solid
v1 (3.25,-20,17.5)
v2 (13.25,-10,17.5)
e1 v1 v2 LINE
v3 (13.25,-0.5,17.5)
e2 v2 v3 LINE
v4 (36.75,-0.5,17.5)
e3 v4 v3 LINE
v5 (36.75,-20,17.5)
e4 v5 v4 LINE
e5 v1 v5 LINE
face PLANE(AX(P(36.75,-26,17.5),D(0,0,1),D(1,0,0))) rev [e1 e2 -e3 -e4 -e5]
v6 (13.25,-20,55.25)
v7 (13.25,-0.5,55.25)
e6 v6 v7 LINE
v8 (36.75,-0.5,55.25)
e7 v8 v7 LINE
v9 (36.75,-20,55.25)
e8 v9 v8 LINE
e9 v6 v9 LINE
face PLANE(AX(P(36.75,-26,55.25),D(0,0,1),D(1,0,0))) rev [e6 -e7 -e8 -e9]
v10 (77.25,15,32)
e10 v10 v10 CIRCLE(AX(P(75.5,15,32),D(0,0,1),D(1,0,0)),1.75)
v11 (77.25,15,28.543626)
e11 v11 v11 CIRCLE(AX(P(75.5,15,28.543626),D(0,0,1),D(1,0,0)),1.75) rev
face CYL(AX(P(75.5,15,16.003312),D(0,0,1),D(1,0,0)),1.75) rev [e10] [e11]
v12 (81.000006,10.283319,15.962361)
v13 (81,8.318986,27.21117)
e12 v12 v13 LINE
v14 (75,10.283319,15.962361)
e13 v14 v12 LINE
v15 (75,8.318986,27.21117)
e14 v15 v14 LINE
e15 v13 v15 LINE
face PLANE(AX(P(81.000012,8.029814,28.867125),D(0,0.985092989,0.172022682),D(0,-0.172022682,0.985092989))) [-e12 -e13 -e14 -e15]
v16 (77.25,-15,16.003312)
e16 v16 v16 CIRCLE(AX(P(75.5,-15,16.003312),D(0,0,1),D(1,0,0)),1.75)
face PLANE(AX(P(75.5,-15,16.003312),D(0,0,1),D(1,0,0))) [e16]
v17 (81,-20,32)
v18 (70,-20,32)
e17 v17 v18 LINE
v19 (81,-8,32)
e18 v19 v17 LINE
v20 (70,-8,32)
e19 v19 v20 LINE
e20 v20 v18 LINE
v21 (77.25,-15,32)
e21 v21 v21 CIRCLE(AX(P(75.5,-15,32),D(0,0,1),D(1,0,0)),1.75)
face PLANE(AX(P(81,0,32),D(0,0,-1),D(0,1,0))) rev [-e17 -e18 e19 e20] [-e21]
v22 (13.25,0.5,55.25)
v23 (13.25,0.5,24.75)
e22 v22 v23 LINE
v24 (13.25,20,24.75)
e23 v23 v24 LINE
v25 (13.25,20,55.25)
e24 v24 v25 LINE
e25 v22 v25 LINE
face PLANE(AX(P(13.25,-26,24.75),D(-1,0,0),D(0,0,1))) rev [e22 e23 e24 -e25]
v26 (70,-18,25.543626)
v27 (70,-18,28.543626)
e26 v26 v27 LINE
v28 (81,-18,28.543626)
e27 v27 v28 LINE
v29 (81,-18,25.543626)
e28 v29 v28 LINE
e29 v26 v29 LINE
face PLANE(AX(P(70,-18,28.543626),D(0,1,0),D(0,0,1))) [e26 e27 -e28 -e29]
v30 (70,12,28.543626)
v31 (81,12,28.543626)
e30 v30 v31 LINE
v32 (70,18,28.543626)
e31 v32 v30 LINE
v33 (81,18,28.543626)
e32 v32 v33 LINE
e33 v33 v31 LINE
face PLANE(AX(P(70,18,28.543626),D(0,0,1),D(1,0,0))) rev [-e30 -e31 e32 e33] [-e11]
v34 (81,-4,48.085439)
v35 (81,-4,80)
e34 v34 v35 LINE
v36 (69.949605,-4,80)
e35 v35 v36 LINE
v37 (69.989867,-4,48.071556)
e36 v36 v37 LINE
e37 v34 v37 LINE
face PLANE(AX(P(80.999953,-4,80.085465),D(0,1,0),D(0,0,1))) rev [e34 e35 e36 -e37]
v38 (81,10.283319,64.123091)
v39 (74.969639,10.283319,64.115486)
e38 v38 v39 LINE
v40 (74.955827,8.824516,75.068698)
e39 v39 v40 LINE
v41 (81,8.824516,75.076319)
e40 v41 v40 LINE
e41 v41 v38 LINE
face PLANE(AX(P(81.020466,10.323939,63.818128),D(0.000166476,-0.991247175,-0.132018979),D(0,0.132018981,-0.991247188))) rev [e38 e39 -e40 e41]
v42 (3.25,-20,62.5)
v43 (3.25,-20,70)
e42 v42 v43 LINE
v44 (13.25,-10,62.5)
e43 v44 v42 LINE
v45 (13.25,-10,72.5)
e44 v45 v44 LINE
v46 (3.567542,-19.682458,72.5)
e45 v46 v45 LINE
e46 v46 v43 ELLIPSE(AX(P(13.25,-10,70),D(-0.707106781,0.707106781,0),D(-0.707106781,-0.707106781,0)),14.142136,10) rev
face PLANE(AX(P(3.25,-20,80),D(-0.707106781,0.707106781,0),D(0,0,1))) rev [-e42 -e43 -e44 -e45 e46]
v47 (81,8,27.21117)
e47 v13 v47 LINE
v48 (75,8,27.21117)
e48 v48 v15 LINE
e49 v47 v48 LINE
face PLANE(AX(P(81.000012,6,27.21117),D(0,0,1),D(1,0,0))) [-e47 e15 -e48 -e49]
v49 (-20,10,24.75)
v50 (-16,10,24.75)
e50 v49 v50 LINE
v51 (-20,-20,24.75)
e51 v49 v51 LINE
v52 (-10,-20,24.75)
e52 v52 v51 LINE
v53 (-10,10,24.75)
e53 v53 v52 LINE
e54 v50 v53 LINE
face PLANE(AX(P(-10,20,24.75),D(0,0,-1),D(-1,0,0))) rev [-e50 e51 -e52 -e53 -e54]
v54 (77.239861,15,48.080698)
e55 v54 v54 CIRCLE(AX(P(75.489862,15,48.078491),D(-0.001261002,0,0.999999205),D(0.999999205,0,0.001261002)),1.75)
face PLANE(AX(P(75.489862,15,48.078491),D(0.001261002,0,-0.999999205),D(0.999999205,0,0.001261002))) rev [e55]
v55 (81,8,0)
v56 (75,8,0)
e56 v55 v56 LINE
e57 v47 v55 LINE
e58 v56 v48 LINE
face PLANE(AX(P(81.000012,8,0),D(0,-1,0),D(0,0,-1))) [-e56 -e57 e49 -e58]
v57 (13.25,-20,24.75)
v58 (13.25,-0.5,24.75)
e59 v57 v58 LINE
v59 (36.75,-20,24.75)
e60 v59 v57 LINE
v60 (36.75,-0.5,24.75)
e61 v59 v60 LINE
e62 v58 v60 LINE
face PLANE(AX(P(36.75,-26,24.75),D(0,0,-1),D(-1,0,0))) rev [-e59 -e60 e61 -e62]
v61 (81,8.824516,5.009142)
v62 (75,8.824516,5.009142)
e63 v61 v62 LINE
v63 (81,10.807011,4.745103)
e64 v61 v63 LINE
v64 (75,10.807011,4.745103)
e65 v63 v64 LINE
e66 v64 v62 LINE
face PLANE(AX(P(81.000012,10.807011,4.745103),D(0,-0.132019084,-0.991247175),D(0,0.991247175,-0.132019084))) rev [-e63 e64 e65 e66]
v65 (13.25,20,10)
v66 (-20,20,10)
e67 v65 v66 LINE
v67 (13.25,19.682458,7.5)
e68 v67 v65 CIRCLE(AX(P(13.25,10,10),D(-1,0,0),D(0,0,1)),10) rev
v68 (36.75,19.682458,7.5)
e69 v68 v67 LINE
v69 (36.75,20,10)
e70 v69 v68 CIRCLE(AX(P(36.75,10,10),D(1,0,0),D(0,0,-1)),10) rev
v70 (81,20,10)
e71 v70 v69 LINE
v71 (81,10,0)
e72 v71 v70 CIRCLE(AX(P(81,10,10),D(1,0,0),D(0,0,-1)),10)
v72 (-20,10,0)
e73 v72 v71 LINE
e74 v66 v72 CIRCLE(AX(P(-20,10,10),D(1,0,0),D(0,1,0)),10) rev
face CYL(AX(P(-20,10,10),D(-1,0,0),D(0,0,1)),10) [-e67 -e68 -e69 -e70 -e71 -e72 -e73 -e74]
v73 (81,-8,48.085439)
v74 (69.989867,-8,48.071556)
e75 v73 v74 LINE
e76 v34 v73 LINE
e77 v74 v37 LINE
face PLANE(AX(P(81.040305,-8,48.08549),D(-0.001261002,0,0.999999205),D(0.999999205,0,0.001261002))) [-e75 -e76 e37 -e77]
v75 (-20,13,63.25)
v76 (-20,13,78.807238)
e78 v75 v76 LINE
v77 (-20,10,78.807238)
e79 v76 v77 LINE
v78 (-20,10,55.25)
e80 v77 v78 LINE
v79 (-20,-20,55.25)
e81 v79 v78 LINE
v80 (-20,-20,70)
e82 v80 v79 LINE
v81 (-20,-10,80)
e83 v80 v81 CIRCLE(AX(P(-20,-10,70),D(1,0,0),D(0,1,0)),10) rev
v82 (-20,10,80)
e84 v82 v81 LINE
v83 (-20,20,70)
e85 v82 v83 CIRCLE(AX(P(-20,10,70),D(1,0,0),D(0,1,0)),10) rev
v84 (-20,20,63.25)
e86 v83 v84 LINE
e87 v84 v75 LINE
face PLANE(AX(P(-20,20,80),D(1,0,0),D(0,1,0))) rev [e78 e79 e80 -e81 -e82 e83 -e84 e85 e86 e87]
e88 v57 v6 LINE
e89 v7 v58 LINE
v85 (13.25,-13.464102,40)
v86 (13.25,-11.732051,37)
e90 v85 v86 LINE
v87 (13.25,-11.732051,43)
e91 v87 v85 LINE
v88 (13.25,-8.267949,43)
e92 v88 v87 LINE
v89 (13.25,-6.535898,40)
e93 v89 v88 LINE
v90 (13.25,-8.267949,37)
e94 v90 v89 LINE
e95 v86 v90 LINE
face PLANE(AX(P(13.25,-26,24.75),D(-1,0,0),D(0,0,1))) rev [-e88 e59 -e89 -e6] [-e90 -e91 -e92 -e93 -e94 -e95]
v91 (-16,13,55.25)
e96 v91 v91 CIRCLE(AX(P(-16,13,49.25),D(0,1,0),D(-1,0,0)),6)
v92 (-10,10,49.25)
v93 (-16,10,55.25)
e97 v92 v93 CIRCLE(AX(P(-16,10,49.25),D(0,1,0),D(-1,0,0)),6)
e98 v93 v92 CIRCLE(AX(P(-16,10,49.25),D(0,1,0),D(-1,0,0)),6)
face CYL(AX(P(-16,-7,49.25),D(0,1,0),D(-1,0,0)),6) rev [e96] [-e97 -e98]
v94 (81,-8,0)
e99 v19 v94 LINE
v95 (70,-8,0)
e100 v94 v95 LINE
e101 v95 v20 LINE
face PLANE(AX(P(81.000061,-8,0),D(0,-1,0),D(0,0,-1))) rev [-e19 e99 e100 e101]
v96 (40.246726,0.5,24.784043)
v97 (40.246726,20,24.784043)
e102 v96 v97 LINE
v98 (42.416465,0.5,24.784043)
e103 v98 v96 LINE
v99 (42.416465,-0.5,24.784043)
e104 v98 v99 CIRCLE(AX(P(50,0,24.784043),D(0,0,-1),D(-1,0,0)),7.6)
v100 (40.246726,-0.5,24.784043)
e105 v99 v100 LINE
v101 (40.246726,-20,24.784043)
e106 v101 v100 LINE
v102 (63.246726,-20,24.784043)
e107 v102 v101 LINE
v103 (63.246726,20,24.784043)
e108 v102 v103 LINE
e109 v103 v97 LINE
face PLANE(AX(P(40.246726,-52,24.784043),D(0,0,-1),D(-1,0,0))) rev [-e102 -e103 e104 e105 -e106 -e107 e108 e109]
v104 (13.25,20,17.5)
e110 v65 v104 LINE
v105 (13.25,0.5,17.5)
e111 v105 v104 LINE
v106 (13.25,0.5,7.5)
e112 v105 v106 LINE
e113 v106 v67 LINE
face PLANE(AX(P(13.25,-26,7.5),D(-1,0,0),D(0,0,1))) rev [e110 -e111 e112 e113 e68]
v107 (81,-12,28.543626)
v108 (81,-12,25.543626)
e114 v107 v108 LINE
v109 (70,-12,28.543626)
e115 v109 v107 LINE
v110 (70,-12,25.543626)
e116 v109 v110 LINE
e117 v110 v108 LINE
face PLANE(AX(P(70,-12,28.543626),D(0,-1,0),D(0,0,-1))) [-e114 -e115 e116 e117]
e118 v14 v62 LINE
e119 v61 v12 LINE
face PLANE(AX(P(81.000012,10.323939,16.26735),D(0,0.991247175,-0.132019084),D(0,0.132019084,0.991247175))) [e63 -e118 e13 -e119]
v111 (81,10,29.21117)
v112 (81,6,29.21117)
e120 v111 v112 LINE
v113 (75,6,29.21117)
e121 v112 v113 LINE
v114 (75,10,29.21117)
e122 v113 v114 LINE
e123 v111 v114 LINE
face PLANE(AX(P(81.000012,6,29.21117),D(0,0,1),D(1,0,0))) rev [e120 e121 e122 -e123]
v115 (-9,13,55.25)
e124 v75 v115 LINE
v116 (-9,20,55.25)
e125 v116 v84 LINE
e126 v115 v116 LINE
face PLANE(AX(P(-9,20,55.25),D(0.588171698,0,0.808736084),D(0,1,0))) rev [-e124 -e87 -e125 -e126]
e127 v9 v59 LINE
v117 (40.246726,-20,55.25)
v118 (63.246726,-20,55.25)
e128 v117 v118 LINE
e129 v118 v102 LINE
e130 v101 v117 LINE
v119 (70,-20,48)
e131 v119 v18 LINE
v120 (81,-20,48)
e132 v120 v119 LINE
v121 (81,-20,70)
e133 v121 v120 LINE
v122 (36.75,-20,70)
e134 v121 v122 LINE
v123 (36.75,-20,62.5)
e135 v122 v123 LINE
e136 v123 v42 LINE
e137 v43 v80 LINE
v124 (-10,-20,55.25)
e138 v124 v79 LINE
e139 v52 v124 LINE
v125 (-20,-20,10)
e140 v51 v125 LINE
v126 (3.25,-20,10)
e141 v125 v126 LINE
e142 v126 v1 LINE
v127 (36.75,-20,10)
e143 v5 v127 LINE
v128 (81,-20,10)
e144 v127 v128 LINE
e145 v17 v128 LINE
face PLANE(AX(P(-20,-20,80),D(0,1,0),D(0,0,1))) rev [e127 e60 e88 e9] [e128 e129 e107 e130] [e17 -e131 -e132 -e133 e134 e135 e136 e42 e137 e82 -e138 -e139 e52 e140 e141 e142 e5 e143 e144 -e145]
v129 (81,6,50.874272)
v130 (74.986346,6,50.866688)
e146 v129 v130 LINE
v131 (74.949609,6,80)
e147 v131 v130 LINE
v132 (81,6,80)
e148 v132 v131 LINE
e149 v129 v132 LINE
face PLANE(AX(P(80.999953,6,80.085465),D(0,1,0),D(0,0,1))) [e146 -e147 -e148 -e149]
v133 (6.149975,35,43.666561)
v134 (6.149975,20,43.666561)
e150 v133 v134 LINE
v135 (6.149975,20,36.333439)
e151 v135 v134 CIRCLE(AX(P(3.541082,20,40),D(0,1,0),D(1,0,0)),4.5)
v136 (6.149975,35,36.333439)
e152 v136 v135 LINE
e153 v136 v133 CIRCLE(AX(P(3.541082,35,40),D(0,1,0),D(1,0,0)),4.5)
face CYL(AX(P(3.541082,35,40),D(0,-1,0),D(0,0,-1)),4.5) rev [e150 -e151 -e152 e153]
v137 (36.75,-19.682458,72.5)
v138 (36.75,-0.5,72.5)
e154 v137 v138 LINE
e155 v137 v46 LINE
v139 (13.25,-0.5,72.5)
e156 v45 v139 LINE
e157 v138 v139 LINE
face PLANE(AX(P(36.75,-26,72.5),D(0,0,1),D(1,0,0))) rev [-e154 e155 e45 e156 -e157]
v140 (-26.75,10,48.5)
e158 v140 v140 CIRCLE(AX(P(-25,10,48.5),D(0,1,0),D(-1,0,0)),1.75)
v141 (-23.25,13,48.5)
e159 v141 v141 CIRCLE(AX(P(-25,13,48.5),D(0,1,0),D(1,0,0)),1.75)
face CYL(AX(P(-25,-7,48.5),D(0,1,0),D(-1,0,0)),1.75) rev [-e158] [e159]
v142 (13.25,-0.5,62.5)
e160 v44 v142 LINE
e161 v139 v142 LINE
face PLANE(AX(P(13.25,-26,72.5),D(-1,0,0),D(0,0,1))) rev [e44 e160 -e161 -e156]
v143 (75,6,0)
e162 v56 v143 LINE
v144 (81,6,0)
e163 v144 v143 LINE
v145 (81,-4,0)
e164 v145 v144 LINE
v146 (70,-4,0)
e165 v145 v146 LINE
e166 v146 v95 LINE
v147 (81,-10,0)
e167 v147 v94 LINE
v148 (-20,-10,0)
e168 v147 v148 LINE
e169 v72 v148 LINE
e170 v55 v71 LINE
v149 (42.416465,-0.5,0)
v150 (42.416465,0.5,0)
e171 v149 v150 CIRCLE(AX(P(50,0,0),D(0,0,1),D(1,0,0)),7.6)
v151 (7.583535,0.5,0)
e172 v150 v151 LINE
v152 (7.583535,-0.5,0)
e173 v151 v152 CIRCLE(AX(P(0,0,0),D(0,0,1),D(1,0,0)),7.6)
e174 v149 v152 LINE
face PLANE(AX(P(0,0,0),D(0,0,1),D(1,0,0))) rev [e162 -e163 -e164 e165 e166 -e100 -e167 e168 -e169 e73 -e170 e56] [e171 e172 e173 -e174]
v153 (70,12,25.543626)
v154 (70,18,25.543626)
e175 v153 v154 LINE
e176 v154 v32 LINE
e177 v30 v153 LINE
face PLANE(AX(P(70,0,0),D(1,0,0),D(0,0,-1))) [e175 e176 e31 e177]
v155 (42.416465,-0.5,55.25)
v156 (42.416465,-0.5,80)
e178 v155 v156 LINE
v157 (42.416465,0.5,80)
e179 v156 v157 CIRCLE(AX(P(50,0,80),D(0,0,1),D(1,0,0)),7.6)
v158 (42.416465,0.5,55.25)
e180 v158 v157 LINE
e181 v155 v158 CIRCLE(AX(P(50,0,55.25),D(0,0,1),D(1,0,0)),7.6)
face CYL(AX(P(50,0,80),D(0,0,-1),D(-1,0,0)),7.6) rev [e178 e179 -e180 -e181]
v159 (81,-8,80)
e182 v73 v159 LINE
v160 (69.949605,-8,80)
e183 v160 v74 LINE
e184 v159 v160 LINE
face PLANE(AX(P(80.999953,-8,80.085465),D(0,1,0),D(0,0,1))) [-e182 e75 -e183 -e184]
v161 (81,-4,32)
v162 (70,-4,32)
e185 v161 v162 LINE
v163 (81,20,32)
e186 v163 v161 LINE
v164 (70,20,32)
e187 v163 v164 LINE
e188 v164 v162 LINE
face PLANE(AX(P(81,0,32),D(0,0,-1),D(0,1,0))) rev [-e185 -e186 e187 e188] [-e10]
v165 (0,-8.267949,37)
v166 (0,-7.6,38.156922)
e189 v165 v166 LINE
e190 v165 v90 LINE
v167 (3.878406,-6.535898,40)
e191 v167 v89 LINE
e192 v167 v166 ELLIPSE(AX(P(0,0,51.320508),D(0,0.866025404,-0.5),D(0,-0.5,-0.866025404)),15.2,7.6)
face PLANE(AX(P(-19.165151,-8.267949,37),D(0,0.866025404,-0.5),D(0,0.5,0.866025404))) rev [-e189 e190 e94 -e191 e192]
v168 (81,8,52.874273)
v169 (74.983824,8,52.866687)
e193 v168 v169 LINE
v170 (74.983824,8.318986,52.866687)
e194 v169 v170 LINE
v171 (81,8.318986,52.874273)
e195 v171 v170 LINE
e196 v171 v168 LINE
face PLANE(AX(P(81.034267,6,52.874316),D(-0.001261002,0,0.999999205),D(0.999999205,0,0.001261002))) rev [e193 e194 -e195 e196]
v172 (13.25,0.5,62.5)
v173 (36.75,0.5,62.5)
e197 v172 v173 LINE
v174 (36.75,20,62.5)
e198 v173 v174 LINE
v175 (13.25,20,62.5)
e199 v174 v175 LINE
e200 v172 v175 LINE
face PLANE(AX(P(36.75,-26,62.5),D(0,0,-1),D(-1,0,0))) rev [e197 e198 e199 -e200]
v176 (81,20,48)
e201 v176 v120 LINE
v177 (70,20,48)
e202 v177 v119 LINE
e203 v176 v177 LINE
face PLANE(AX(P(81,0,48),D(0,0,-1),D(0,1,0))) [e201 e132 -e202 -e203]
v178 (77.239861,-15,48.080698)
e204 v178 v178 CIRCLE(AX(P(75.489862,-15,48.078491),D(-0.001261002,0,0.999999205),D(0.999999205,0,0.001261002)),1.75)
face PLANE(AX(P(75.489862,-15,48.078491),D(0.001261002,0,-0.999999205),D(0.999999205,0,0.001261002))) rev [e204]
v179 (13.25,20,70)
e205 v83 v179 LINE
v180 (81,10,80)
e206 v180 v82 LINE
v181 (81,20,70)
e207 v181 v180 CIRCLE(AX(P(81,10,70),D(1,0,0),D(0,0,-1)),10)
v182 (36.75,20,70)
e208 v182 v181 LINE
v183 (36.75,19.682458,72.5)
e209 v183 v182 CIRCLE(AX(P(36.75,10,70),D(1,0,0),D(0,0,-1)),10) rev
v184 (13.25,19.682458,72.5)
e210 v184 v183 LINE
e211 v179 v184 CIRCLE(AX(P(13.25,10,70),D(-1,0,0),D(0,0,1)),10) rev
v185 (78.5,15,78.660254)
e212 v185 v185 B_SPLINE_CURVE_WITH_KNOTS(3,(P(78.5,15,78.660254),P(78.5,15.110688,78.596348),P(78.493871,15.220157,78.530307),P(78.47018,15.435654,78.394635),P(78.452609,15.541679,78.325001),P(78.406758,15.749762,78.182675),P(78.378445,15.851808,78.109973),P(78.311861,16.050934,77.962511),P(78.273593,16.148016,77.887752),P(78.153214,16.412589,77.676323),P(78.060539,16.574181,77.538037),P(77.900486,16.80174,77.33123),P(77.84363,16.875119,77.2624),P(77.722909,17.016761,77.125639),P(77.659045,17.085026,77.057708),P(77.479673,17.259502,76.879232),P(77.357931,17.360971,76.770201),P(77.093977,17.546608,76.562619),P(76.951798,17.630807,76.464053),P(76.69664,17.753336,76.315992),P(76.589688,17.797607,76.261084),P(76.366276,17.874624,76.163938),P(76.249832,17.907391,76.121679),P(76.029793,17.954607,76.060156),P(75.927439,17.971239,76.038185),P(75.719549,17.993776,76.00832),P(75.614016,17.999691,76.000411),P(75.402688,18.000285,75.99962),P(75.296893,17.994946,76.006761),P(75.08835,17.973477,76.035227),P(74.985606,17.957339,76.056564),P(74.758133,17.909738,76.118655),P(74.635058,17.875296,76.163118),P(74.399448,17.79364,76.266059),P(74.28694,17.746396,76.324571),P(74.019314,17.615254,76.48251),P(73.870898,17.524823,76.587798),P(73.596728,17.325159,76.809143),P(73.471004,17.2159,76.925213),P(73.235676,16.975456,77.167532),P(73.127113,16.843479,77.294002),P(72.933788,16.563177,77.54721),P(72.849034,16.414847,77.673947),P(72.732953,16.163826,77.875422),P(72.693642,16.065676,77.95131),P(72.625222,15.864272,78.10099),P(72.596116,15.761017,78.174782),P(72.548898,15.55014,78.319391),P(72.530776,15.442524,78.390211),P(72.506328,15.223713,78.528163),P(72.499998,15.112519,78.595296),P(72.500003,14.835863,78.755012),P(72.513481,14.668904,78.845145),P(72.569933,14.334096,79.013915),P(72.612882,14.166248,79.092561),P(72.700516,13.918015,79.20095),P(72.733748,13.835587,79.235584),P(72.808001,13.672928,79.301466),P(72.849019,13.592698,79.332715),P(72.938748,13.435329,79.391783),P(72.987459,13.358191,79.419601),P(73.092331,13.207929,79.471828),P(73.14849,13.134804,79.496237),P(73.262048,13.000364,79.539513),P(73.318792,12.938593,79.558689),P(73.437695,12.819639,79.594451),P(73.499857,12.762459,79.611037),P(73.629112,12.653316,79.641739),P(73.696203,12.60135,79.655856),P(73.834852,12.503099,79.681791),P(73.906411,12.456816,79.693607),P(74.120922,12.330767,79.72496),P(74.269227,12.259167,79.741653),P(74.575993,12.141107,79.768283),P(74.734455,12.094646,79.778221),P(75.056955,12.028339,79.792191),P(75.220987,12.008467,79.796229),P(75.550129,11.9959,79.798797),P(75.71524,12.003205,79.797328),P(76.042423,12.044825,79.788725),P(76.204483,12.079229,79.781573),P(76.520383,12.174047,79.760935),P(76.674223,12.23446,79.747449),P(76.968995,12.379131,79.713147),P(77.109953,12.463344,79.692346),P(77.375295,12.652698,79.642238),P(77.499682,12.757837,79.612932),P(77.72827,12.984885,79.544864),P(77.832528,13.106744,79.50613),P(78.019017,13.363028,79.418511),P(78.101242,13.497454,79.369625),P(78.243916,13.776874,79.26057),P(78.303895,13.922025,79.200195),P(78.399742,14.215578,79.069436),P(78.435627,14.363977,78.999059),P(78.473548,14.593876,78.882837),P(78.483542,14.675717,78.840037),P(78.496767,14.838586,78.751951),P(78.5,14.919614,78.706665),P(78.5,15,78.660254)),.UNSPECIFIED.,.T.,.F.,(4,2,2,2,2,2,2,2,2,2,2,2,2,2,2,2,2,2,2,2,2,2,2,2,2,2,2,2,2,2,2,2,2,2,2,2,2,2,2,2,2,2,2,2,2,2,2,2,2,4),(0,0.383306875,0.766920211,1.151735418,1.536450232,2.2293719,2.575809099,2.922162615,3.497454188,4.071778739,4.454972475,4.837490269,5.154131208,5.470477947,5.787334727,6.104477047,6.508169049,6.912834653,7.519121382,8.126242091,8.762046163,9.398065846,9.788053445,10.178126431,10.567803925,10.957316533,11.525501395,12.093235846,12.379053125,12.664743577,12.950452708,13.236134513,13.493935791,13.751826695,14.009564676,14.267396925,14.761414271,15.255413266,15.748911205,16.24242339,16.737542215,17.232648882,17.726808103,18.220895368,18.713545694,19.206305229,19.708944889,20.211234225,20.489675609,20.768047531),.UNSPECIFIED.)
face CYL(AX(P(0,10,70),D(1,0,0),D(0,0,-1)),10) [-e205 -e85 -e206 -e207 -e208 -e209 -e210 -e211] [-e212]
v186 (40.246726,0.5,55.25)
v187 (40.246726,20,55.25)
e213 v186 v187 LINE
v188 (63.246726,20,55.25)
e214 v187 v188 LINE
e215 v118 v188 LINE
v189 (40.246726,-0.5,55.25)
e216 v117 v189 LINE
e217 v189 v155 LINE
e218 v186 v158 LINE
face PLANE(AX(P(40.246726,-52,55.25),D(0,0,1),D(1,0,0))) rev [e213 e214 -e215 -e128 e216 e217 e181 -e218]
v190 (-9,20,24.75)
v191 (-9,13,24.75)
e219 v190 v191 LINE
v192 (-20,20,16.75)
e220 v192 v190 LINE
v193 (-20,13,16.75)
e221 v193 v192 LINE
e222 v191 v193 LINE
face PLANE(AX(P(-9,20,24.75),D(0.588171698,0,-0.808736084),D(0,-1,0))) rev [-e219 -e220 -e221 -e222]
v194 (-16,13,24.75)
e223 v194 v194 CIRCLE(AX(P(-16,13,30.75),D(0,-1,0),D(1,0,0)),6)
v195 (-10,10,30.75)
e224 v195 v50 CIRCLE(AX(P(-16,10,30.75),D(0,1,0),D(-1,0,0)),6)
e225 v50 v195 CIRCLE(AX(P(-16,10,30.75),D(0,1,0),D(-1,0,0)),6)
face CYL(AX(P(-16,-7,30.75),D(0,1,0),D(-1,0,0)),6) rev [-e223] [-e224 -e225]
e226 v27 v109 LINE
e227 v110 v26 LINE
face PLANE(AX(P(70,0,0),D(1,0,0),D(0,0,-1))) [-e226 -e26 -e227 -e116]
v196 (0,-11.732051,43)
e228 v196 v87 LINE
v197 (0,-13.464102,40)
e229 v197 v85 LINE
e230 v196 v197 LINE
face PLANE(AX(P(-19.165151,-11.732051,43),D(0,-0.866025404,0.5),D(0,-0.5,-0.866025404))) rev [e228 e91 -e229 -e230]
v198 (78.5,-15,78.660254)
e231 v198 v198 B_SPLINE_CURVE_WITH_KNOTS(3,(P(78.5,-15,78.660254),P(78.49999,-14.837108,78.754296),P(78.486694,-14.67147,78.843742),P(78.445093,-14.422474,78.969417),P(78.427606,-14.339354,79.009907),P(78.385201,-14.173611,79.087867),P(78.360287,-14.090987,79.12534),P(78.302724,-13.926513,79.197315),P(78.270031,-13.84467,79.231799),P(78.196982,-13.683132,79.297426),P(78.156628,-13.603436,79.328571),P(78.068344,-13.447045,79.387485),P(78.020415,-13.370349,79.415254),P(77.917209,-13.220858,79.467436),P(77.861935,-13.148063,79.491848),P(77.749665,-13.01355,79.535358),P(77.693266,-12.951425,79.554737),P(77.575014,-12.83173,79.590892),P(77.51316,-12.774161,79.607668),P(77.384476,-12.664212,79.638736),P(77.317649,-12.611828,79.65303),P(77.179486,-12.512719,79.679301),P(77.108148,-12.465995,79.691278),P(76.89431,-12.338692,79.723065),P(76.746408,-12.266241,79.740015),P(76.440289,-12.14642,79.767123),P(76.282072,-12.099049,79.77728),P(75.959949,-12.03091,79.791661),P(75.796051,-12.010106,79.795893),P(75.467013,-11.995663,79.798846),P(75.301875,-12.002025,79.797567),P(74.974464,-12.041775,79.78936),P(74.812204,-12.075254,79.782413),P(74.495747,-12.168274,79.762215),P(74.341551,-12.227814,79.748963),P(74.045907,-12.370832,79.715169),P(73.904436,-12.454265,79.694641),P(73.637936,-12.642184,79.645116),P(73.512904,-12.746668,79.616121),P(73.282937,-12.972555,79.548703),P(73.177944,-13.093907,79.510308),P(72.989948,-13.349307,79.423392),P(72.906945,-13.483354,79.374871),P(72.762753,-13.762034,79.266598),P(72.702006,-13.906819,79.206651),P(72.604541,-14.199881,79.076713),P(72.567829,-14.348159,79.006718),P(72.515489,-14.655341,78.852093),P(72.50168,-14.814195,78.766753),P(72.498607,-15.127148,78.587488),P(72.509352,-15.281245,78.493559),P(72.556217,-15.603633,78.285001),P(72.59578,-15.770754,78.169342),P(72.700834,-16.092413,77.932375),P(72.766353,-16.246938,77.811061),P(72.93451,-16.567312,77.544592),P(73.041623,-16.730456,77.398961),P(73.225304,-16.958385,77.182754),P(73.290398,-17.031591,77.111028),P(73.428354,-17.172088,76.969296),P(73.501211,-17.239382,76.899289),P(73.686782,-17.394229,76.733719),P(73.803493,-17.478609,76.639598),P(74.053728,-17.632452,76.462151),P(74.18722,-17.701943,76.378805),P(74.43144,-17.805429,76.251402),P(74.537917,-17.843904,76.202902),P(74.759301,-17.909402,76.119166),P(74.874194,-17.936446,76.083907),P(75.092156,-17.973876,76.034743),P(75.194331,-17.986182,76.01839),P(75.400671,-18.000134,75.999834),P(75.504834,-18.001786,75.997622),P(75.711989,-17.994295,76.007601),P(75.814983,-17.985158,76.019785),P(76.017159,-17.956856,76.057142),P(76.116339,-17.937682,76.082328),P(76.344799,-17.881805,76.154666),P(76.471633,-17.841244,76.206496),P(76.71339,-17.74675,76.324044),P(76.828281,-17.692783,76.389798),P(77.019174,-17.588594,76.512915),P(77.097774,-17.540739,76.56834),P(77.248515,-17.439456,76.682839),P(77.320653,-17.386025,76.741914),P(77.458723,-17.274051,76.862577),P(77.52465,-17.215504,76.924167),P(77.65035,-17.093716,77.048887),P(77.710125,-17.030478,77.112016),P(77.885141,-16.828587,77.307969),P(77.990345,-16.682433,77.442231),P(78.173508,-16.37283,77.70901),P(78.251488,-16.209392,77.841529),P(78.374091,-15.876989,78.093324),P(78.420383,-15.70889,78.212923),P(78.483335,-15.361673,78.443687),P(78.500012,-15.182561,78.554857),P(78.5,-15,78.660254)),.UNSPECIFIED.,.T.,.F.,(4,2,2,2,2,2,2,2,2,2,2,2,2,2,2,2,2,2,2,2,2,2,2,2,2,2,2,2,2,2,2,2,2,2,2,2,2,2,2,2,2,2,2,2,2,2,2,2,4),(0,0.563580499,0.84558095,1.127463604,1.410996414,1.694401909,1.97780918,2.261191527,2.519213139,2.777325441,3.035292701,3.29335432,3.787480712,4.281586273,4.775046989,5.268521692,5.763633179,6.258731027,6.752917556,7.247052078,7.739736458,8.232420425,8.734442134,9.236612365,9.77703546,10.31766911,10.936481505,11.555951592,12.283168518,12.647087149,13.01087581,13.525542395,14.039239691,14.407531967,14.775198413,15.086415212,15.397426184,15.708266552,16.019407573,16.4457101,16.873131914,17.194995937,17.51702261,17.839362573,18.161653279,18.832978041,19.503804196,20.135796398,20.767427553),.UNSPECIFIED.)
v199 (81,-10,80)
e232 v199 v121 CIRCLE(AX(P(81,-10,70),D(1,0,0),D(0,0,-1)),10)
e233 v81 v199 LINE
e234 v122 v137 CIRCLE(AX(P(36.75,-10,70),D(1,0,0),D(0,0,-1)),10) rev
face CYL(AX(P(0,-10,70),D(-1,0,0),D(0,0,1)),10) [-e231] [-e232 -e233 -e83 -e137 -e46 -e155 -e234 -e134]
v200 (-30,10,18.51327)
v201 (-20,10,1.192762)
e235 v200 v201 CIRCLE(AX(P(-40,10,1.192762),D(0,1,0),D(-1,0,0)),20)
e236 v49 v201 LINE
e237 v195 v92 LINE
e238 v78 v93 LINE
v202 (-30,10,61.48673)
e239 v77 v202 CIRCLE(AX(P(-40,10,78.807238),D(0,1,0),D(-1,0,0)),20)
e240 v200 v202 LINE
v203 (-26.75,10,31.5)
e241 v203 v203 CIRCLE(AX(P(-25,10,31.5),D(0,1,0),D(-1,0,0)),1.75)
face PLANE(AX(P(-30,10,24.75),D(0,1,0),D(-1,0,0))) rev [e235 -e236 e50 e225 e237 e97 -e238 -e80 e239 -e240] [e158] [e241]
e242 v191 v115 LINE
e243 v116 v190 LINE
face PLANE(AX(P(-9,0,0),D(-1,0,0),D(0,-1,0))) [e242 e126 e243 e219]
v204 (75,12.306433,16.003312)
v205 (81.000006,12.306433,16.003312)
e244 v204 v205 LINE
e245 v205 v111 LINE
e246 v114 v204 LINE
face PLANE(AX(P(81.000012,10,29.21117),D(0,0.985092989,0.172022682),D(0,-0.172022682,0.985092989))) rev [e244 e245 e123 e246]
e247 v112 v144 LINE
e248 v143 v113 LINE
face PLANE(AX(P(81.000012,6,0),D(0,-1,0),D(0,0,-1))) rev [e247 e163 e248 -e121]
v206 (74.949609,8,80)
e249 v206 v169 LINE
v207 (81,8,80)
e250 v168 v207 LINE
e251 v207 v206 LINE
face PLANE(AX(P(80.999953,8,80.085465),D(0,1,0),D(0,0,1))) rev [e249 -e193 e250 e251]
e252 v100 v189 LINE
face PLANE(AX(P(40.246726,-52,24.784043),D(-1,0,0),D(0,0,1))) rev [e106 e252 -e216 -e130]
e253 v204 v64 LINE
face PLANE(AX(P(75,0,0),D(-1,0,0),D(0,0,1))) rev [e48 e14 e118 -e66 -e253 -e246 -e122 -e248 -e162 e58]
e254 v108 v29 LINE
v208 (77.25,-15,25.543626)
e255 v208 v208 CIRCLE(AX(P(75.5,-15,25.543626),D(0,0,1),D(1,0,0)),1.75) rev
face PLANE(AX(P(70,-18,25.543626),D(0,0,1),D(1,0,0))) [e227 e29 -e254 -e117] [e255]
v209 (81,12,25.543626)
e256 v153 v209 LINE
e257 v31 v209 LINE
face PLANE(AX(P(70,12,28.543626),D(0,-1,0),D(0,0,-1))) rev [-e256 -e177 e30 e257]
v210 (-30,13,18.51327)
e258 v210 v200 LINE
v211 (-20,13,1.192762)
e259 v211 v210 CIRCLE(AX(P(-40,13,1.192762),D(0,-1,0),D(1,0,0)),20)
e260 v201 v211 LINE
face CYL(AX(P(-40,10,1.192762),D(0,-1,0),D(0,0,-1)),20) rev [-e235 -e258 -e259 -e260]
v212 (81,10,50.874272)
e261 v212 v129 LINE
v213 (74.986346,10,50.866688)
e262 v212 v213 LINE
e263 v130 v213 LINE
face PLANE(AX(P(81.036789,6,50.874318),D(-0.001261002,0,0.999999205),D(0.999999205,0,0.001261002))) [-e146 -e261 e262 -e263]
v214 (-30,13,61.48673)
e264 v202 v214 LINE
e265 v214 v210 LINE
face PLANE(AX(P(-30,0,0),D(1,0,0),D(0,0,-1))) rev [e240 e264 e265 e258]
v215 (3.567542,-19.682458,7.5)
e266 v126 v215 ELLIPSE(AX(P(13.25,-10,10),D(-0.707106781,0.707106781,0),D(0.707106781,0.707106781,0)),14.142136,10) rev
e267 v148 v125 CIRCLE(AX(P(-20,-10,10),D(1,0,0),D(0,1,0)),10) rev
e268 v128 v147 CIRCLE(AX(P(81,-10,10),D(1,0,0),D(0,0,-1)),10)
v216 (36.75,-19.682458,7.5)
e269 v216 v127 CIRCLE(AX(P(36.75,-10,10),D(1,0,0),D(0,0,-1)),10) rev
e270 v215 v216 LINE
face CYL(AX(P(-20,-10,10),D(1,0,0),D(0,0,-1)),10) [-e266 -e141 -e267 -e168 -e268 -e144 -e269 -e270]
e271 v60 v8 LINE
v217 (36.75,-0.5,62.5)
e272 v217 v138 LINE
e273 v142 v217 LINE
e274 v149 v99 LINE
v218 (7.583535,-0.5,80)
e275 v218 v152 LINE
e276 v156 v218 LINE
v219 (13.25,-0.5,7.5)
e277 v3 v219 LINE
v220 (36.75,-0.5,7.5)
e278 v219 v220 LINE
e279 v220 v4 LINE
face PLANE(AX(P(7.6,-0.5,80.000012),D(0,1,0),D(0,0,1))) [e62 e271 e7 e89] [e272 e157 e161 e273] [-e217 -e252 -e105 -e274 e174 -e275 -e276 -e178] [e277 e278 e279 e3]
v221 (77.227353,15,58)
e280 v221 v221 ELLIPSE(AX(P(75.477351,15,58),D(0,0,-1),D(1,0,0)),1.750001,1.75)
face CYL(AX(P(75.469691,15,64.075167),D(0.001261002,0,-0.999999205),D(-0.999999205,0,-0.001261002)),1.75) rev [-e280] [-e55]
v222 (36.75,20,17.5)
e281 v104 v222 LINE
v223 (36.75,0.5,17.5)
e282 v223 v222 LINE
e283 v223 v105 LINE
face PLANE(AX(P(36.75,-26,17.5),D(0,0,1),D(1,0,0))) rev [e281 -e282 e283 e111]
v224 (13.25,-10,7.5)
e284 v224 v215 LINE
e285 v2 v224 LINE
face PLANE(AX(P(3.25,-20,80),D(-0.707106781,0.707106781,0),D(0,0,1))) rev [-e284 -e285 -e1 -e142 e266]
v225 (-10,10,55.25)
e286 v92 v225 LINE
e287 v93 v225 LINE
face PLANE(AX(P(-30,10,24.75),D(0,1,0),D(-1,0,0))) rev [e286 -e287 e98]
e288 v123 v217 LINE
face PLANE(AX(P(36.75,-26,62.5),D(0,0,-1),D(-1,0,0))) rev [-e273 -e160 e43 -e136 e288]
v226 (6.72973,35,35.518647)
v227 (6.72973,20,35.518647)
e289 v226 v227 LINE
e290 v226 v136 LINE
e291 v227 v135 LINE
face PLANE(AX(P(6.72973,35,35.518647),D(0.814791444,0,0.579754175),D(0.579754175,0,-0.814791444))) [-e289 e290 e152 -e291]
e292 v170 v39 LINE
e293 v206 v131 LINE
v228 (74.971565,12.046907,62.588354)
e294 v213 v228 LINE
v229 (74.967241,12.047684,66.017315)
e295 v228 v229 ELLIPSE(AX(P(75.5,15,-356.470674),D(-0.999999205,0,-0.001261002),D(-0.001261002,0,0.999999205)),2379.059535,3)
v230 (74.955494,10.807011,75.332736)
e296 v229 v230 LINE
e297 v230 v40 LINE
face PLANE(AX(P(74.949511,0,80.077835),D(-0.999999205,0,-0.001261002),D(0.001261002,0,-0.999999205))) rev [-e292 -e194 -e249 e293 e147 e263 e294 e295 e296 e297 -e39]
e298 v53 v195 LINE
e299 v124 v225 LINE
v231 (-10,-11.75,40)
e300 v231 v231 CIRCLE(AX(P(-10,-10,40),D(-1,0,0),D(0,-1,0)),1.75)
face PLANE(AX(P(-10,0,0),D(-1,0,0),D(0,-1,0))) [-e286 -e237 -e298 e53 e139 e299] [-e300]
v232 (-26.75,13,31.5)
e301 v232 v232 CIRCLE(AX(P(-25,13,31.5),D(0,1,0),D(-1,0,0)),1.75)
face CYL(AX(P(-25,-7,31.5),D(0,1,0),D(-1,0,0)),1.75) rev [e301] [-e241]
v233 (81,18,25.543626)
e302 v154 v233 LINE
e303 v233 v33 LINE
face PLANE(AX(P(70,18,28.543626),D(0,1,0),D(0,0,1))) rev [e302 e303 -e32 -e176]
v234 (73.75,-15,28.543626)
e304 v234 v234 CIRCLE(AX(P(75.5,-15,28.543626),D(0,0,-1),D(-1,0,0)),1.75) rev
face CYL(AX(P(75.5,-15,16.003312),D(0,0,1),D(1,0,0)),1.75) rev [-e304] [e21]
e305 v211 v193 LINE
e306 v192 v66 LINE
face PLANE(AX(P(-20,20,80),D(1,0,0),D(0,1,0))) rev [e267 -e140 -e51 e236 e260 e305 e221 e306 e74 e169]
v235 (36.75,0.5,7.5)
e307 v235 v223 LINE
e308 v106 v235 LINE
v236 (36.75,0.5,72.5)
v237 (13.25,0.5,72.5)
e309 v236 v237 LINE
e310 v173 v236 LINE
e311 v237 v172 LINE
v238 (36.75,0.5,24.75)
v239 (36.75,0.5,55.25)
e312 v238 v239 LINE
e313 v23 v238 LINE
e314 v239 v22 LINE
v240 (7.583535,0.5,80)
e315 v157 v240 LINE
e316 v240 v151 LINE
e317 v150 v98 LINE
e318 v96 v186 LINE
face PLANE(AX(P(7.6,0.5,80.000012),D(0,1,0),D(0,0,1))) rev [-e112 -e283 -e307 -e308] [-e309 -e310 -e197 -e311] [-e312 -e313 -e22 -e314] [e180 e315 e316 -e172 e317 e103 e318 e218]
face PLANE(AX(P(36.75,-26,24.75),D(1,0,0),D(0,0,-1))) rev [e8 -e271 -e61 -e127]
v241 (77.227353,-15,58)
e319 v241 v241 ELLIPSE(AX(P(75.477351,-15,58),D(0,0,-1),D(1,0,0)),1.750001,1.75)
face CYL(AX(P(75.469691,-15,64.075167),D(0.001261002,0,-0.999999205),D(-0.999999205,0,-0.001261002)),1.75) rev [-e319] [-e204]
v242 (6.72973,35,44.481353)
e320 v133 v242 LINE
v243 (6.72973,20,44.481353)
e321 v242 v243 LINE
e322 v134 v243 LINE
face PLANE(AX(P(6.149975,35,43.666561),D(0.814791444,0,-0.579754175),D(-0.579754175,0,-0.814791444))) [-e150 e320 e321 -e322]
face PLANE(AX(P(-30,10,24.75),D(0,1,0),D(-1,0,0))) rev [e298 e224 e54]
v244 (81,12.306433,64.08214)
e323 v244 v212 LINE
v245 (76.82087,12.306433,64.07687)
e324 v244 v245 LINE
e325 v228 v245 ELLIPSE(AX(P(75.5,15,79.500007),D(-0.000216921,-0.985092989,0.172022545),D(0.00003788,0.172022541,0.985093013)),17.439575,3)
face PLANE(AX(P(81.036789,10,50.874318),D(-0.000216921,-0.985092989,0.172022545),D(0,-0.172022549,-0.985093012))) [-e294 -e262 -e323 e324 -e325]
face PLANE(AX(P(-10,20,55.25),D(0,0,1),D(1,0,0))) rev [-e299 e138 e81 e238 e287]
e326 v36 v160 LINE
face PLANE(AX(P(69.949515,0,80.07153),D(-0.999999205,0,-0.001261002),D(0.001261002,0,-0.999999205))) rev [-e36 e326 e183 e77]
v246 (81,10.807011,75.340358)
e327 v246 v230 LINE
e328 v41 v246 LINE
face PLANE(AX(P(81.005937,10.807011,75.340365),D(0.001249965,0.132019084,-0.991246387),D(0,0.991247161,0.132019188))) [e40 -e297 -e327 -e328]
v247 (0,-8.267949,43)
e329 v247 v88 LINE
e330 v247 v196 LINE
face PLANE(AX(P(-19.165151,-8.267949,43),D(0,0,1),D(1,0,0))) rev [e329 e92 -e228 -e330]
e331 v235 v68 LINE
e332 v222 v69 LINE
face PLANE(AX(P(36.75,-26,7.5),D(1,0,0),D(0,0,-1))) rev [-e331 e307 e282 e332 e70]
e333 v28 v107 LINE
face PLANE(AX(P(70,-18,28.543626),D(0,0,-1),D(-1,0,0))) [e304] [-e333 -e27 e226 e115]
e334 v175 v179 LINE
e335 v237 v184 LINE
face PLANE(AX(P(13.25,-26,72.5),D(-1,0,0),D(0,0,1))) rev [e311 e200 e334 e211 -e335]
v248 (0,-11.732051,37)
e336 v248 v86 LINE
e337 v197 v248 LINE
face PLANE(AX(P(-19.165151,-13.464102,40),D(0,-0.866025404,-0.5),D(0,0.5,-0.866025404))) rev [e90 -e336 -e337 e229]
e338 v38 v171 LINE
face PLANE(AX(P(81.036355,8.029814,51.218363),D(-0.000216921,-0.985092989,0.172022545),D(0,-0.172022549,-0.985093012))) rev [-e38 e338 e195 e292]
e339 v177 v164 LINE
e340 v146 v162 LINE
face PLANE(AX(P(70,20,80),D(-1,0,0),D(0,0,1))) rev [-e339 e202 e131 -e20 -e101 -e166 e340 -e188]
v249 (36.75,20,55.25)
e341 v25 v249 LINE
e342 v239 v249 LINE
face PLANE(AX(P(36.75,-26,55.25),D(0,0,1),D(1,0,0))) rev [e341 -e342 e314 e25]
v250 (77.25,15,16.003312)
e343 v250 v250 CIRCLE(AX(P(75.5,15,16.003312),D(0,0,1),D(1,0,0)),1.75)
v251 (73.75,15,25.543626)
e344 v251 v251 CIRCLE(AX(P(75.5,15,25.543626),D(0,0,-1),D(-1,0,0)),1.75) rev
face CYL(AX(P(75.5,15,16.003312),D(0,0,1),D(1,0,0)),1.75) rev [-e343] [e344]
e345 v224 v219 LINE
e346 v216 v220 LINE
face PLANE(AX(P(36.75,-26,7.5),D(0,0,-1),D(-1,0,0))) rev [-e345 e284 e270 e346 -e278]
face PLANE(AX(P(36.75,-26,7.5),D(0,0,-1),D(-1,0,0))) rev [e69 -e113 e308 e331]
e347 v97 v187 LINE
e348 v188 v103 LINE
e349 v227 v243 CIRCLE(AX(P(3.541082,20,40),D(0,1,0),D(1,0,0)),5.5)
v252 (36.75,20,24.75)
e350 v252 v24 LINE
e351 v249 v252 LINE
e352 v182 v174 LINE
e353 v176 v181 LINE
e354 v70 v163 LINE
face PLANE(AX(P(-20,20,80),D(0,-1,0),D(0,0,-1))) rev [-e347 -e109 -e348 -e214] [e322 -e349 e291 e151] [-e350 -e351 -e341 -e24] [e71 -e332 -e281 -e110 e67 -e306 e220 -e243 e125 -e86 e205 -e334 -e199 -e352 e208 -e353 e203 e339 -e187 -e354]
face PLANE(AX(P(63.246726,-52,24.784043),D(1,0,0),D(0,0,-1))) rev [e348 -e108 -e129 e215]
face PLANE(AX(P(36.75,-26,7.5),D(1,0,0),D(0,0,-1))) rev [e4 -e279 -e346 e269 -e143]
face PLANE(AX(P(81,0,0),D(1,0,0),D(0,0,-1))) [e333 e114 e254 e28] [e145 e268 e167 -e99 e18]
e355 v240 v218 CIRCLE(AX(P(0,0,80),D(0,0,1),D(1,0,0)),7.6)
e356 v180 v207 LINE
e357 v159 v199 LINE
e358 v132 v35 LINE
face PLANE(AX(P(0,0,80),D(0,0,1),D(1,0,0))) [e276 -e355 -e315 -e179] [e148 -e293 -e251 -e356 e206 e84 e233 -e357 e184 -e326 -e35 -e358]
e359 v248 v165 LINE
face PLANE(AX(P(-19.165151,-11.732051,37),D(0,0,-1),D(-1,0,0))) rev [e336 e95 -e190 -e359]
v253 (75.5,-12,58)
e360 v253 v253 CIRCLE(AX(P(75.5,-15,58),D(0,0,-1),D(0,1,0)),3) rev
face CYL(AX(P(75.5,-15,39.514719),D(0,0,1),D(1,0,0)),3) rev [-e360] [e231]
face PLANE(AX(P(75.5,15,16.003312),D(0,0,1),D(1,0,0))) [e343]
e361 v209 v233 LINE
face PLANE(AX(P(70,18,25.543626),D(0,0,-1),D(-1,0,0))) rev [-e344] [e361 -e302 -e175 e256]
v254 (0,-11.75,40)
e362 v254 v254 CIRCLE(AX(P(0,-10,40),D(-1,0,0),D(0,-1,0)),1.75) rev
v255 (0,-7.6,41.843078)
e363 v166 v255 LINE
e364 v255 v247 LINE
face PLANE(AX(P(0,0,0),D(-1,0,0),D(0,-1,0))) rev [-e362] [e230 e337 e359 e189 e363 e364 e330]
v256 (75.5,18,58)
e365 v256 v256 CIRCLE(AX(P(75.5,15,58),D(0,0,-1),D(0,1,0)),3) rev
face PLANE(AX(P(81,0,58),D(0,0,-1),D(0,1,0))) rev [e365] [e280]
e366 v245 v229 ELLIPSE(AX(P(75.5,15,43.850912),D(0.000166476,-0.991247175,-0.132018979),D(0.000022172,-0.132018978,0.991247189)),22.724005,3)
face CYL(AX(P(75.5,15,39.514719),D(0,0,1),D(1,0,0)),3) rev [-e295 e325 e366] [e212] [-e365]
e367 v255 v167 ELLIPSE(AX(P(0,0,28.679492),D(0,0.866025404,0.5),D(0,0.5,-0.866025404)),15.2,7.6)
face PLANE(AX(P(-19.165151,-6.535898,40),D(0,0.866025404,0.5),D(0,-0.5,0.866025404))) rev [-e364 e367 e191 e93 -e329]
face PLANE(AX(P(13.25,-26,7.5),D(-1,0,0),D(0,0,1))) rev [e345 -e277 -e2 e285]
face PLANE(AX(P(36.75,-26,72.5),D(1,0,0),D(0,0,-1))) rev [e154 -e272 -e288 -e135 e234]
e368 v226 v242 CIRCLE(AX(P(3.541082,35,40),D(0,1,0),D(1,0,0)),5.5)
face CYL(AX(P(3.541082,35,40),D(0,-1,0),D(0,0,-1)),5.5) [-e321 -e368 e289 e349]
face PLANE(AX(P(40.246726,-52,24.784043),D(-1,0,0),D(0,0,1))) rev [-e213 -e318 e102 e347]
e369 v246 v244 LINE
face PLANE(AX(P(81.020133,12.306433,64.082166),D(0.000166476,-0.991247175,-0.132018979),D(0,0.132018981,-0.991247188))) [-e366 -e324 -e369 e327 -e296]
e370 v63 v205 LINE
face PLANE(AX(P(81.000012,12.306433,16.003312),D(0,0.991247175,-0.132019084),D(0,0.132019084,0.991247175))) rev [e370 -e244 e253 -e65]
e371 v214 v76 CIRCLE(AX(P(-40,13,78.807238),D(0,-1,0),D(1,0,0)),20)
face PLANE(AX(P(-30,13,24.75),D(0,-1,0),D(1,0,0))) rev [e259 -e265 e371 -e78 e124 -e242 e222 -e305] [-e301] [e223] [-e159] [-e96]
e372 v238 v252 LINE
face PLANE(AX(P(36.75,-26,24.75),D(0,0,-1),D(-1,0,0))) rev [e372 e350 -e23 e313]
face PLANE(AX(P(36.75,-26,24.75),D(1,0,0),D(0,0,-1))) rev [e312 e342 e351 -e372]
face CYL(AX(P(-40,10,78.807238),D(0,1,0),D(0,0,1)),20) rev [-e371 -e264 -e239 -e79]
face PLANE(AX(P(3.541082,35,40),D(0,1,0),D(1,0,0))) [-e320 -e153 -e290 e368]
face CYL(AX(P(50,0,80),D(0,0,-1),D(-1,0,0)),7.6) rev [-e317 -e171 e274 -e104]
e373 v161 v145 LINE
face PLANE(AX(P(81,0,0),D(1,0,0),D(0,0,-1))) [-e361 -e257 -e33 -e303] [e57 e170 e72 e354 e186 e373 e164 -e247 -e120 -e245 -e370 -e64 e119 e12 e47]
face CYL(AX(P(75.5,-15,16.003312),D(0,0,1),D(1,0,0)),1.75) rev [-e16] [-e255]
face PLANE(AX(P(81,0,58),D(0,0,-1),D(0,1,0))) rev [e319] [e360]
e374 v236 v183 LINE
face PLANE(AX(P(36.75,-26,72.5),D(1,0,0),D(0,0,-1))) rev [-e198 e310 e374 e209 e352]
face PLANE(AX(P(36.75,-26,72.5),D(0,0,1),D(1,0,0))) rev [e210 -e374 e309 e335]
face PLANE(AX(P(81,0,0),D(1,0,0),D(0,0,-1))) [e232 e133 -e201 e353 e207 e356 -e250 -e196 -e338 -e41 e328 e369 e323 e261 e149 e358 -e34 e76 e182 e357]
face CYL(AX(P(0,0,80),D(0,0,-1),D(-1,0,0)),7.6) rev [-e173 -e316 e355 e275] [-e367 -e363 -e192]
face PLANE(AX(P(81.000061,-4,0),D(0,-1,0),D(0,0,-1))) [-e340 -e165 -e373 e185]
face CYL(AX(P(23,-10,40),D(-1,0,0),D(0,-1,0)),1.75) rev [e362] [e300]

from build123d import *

# Parameters (mm, degrees)
SKETCH1_W                    = 90
SKETCH1_H                    = 40
SKETCH1_R                    = 7.6
BOSS_EXTRUDE1_DEPTH          = 80
SKETCH2_W                    = 30.5
SKETCH2_H                    = 40
CUT_EXTRUDE1_DEPTH           = 10
SKETCH3_W                    = 23.5
SKETCH3_H                    = 30.5
SKETCH3_H_2                  = 10
CUT_EXTRUDE2_DEPTH           = 46
CHAMFER1_SIZE                = 10
SKETCH4_W                    = 30.5
SKETCH4_H                    = 3
BOSS_EXTRUDE2_DEPTH          = 20
SKETCH5_R                    = 1.75
CUT_EXTRUDE3_DEPTH           = 20
SKETCH6_R                    = 6
CUT_EXTRUDE4_DEPTH           = 20
SKETCH8_W                    = 30.5
SKETCH8_H                    = 7
CUT_EXTRUDE5_DEPTH           = 1
CHAMFER3_SIZE                = 8
CHAMFER3_SIZE_2              = 11
CHAMFER4_SIZE                = 8
CHAMFER4_SIZE_2              = 45.370254557
SKETCH9_R                    = 1.75
CUT_EXTRUDE6_DEPTH           = 33
CUT_EXTRUDE7_DEPTH           = 13.25
EXTRUDE_THIN1_DEPTH          = 15
FILLET1_R                    = 10
CUT_EXTRUDE_THIN1_DEPTH      = 112.915146428
CUT_EXTRUDE_THIN1_DEPTH_BACK = 95
FILLET2_START                = 10
FILLET2_DEPTH                = 3
BOSS_EXTRUDE3_DEPTH          = 11
CUT_EXTRUDE_THIN2_START      = -6
CUT_EXTRUDE_THIN2_DEPTH      = 148.230308362
CUT_EXTRUDE_THIN3_START      = -11
SKETCH15_W                   = 32
SKETCH15_H                   = 4
CUT_EXTRUDE_THIN3_DEPTH      = 153.230308362
SKETCH16_R                   = 1.75
CUT_EXTRUDE8_DEPTH           = 15.99669
SKETCH17_W                   = 3
SKETCH17_H                   = 6
CUT_EXTRUDE9_DEPTH           = 11
SKETCH18_W                   = 23
SKETCH18_H                   = 30.465957047
CUT_EXTRUDE10_DEPTH          = 72
SKETCH19_R                   = 3
CUT_EXTRUDE11_DEPTH          = 22


with BuildPart() as part:
    # Sketch1 → Boss-Extrude1 (new body)
    with BuildSketch(Plane.XY):
        with Locations((25, 0)):
            Rectangle(SKETCH1_W, SKETCH1_H)
        Circle(SKETCH1_R, mode=Mode.SUBTRACT)
        with Locations((50, 0)):
            Circle(SKETCH1_R, mode=Mode.SUBTRACT)
    extrude(amount=BOSS_EXTRUDE1_DEPTH)

    # Sketch2 → Cut-Extrude1 (cut)
    with BuildSketch(Plane.ZY.offset(20)):
        with Locations((40, 0)):
            Rectangle(SKETCH2_W, SKETCH2_H)
    extrude(amount=-CUT_EXTRUDE1_DEPTH, mode=Mode.SUBTRACT)

    # Sketch3 → Cut-Extrude2 (cut)
    with BuildSketch(Plane(origin=(0, 20, 0), x_dir=(1, 0, 0), z_dir=(0, 1, 0))):
        with Locations((25, -40)):
            Rectangle(SKETCH3_W, SKETCH3_H)
        with Locations((25, -12.5)):
            Rectangle(SKETCH3_W, SKETCH3_H_2)
        with Locations((25, -67.5)):
            Rectangle(SKETCH3_W, SKETCH3_H_2)
    extrude(amount=-CUT_EXTRUDE2_DEPTH, mode=Mode.SUBTRACT)

    # Chamfer1
    chamfer1_edges = [part.edges().sort_by_distance(p)[0] for p in [
        (13.25, -20, 67.5),
        (13.25, -20, 12.5),
    ]]
    chamfer(chamfer1_edges, length=CHAMFER1_SIZE)

    # Sketch4 → Boss-Extrude2 (add)
    with BuildSketch(Plane.ZY.offset(10)):
        with Locations((40, 11.5)):
            Rectangle(SKETCH4_W, SKETCH4_H)
    extrude(amount=BOSS_EXTRUDE2_DEPTH)

    # Sketch5 → Cut-Extrude3 (cut)
    with BuildSketch(Plane(origin=(0, 13, 0), x_dir=(1, 0, 0), z_dir=(0, 1, 0))):
        with Locations(Location((-25, -31.5, 0), (0, 0, 180))):
            Circle(SKETCH5_R)
        with Locations(Location((-25, -48.5, 0), (0, 0, 180))):
            Circle(SKETCH5_R)
    extrude(amount=-CUT_EXTRUDE3_DEPTH, mode=Mode.SUBTRACT)

    # Sketch6 → Cut-Extrude4 (cut)
    with BuildSketch(Plane(origin=(0, 13, 0), x_dir=(1, 0, 0), z_dir=(0, 1, 0))):
        with Locations(Location((-16, -30.75, 0), (0, 0, 90))):
            Circle(SKETCH6_R)
        with Locations(Location((-16, -49.25, 0), (0, 0, 270))):
            Circle(SKETCH6_R)
    extrude(amount=-CUT_EXTRUDE4_DEPTH, mode=Mode.SUBTRACT)

    # Sketch8 → Cut-Extrude5 (cut)
    with BuildSketch(Plane.ZY.offset(10)):
        with Locations((40, 16.5)):
            Rectangle(SKETCH8_W, SKETCH8_H)
    extrude(amount=-CUT_EXTRUDE5_DEPTH, mode=Mode.SUBTRACT)

    # Chamfer3
    # the kernel refuses this chamfer: 11, 8 mm, written as the material it takes off along each edge
    with BuildSketch(Plane(origin=(-20, 48.396981056, 55.25), x_dir=(0, 0, 1), z_dir=(0, -1, 0))) as chamfer3_piece_1:
        Polygon((CHAMFER3_SIZE, 0), (0, -CHAMFER3_SIZE_2), (0, 0), align=None)
    extrude(amount=35.396981056, mode=Mode.SUBTRACT)
    with BuildSketch(Plane(origin=(-20, 13, 24.75), x_dir=(1, 0, 0), z_dir=(0, 1, 0))) as chamfer3_piece_2:
        Polygon((CHAMFER3_SIZE_2, 0), (0, CHAMFER3_SIZE), (0, 0), align=None)
    extrude(amount=35.396981056, mode=Mode.SUBTRACT)

    # Chamfer4
    # the kernel refuses this chamfer: 45.370254557, 8 mm, written as the material it adds along each edge
    with BuildSketch(Plane(origin=(-20, 13, 55.25), x_dir=(0, 0, 1), z_dir=(0, -1, 0))) as chamfer4_piece_1_section:
        Polygon((CHAMFER4_SIZE, 0), (0, CHAMFER4_SIZE_2), (0, 0), align=None)
    chamfer4_piece_1 = extrude(amount=3, mode=Mode.PRIVATE)
    chamfer4_piece_1 = split(chamfer4_piece_1, bisect_by=Plane(origin=(-30, 13, 55.25), z_dir=(1, 0, 0)), keep=Keep.TOP, mode=Mode.PRIVATE)
    add(chamfer4_piece_1)
    # the kernel refuses this chamfer: 45.370254557, 8 mm, written as the material it adds along each edge
    with BuildSketch(Plane(origin=(-20, 10, 24.75), x_dir=(0, 0, -1), z_dir=(0, 1, 0))) as chamfer4_2_piece_1_section:
        Polygon((CHAMFER4_SIZE, 0), (0, CHAMFER4_SIZE_2), (0, 0), align=None)
    chamfer4_2_piece_1 = extrude(amount=3, mode=Mode.PRIVATE)
    chamfer4_2_piece_1 = split(chamfer4_2_piece_1, bisect_by=Plane(origin=(-30, 10, 24.75), z_dir=(1, 0, 0)), keep=Keep.TOP, mode=Mode.PRIVATE)
    add(chamfer4_2_piece_1)

    # Sketch9 → Cut-Extrude6 (cut)
    with BuildSketch(Plane.ZY.offset(10)):
        with Locations(Location((40, -10, 0), (0, 0, 270))):
            Circle(SKETCH9_R)
    extrude(amount=-CUT_EXTRUDE6_DEPTH, mode=Mode.SUBTRACT)

    # Sketch10 → Cut-Extrude7 (cut)
    with BuildSketch(Plane(origin=(13.25, 0, 0), x_dir=(0, 0, -1), z_dir=(1, 0, 0))):
        Polygon((-40, -13.464101615), (-37, -11.732050808), (-37, -8.267949192), (-40, -6.535898385), (-43, -8.267949192), (-43, -11.732050808), align=None)
    extrude(amount=-CUT_EXTRUDE7_DEPTH, mode=Mode.SUBTRACT)

    # Sketch11 → Extrude-Thin1 (add)
    with BuildSketch(Plane(origin=(0, 20, 0), x_dir=(1, 0, 0), z_dir=(0, 1, 0))):
        with BuildLine():
            ThreePointArc((6.729729503, -35.51864706), (-1.958918458, -40), (6.729729503, -44.48135294))
            Line((6.729729503, -44.48135294), (6.149975329, -43.666561497))
            ThreePointArc((6.149975329, -43.666561497), (-0.958918458, -40), (6.149975329, -36.333438503))
            Line((6.149975329, -36.333438503), (6.729729503, -35.51864706))
        make_face()
    extrude(amount=EXTRUDE_THIN1_DEPTH)

    # Fillet1
    # the kernel refuses this fillet: 10 mm, written as the material it takes off along each edge
    with BuildSketch(Plane(origin=(-45, 20, 80), x_dir=(0, 0, -1), z_dir=(1, 0, 0)), Plane(origin=(95, -20, 80), x_dir=(0, 0, -1), z_dir=(-1, 0, 0)), Plane(origin=(95, -20, 0), x_dir=(0, 1, 0), z_dir=(-1, 0, 0)), Plane(origin=(-45, 20, 0), x_dir=(0, -1, 0), z_dir=(1, 0, 0))) as fillet1_piece_1:
        with BuildLine():
            CenterArc((FILLET1_R, -FILLET1_R), FILLET1_R, 90, 90)
            Line((0, -FILLET1_R), (0, 0))
            Line((0, 0), (FILLET1_R, 0))
        make_face()
    extrude(amount=140, mode=Mode.SUBTRACT)

    # Sketch12 → Cut-Extrude-Thin1 (cut, two sides: drawn at the far end of the back side and taken through both)
    with BuildSketch(Plane.XY.offset(80).offset(-CUT_EXTRUDE_THIN1_DEPTH_BACK)):
        Polygon((3.119310539, -0.5), (7.6, -0.5), (42.4, -0.5), (46.98201893, -0.5), (46.98201893, 0.5), (42.4, 0.5), (7.6, 0.5), (3.119310539, 0.5), align=None)
    extrude(amount=CUT_EXTRUDE_THIN1_DEPTH + CUT_EXTRUDE_THIN1_DEPTH_BACK, mode=Mode.SUBTRACT)

    # Fillet2: read off the stored shape, not the designer's step
    # Fillet2 outline → Fillet2 (add)
    with BuildSketch(Plane(origin=(0, 0, 0), x_dir=(1, 0, 0), z_dir=(0, 1, 0)).offset(FILLET2_START)):
        with BuildLine():
            ThreePointArc((-30, -61.486730193), (-22.679491924, -68.807238269), (-20, -78.807238269))
            Line((-20, -78.807238269), (-20, -63.25))
            Line((-20, -63.25), (-30, -61.486730193))
        make_face()
        with BuildLine():
            Line((-20, -16.75), (-20, -1.192761731))
            ThreePointArc((-20, -1.192761731), (-22.679491924, -11.192761731), (-30, -18.513269807))
            Line((-30, -18.513269807), (-20, -16.75))
        make_face()
    extrude(amount=FILLET2_DEPTH)

    # Sketch13 → Boss-Extrude3 (add)
    with BuildSketch(Plane(origin=(70, 0, 0), x_dir=(0, 0, -1), z_dir=(1, 0, 0))):
        with BuildLine():
            Line((-10, 20), (-32, 20))
            Line((-32, 20), (-32, -20))
            Line((-32, -20), (-10, -20))
            ThreePointArc((-10, -20), (-2.928932188, -17.071067812), (0, -10))
            Line((0, -10), (0, 10))
            ThreePointArc((0, 10), (-2.928932188, 17.071067812), (-10, 20))
        make_face()
        with BuildLine():
            Line((-48, -20), (-48, 20))
            Line((-48, 20), (-70, 20))
            ThreePointArc((-70, 20), (-77.071067812, 17.071067812), (-80, 10))
            Line((-80, 10), (-80, -10))
            ThreePointArc((-80, -10), (-77.071067812, -17.071067812), (-70, -20))
            Line((-70, -20), (-48, -20))
        make_face()
    extrude(amount=BOSS_EXTRUDE3_DEPTH)

    # Sketch14 → Cut-Extrude-Thin2 (cut)
    with BuildSketch(Plane(origin=(81, 0, 0), x_dir=(0, 0, -1), z_dir=(1, 0, 0)).offset(CUT_EXTRUDE_THIN2_START)):
        Polygon((0, 6), (-29.211170014, 6), (-29.211170014, 10), (-16.003311772, 12.306433224), (-4.745103337, 10.807010671), (-5.009141506, 8.824516321), (-15.962361409, 10.283319029), (-27.211170014, 8.318986477), (-27.211170014, 8), (0, 8), align=None)
    cut_extrude_thin2 = extrude(amount=CUT_EXTRUDE_THIN2_DEPTH, mode=Mode.SUBTRACT)

    # Sketch15 → Cut-Extrude-Thin3 (cut)
    with BuildSketch(Plane(origin=(81, 0, 0), x_dir=(0, 0, -1), z_dir=(1, 0, 0)).offset(CUT_EXTRUDE_THIN3_START)):
        with Locations((-16, -6)):
            Rectangle(SKETCH15_W, SKETCH15_H)
    cut_extrude_thin3 = extrude(amount=CUT_EXTRUDE_THIN3_DEPTH, mode=Mode.SUBTRACT)

    # Sketch16 → Cut-Extrude8 (cut)
    with BuildSketch(Plane.XY.offset(32)):
        with Locations((75.5, 15)):
            Circle(SKETCH16_R)
        with Locations((75.5, -15)):
            Circle(SKETCH16_R)
    cut_extrude8 = extrude(amount=-CUT_EXTRUDE8_DEPTH, mode=Mode.SUBTRACT)

    # Sketch17 → Cut-Extrude9 (cut)
    with BuildSketch(Plane(origin=(81, 0, 0), x_dir=(0, 0, -1), z_dir=(1, 0, 0))):
        with Locations((-27.043626223, 15)):
            Rectangle(SKETCH17_W, SKETCH17_H)
    cut_extrude9 = extrude(amount=-CUT_EXTRUDE9_DEPTH, mode=Mode.SUBTRACT)

    # Mirror1: Cut-Extrude9 across plane
    add(cut_extrude9.mirror(Plane.ZX), mode=Mode.SUBTRACT)

    # Sketch18 → Cut-Extrude10 (cut)
    with BuildSketch(Plane(origin=(0, 20, 0), x_dir=(1, 0, 0), z_dir=(0, 1, 0))):
        with Locations((51.74672632, -40.017021476)):
            Rectangle(SKETCH18_W, SKETCH18_H)
    extrude(amount=-CUT_EXTRUDE10_DEPTH, mode=Mode.SUBTRACT)

    # Mirror4: Cut-Extrude-Thin2, Cut-Extrude-Thin3 across plane
    add(cut_extrude_thin2.mirror(Plane(origin=(-0.025214783, 0, 39.991629957), x_dir=(0.9999998012339909, 0, 0.0006305013708499051), z_dir=(0.0006305013708499051, 0, -0.999999801233991))), mode=Mode.SUBTRACT)
    add(cut_extrude_thin3.mirror(Plane(origin=(-0.025214783, 0, 39.991629957), x_dir=(0.9999998012339909, 0, 0.0006305013708499051), z_dir=(0.0006305013708499051, 0, -0.999999801233991))), mode=Mode.SUBTRACT)

    # Mirror5: Cut-Extrude8 across plane
    add(cut_extrude8.mirror(Plane(origin=(-0.025214783, 0, 39.991629957), x_dir=(0.9999998012339909, 0, 0.0006305013708499051), z_dir=(0.0006305013708499051, 0, -0.999999801233991))), mode=Mode.SUBTRACT)

    # Sketch19 → Cut-Extrude11 (cut)
    with BuildSketch(Plane.XY.offset(80)):
        with Locations((75.5, 15)):
            Circle(SKETCH19_R)
        with Locations((75.5, -15)):
            Circle(SKETCH19_R)
    extrude(amount=-CUT_EXTRUDE11_DEPTH, mode=Mode.SUBTRACT)


solid = part.part
